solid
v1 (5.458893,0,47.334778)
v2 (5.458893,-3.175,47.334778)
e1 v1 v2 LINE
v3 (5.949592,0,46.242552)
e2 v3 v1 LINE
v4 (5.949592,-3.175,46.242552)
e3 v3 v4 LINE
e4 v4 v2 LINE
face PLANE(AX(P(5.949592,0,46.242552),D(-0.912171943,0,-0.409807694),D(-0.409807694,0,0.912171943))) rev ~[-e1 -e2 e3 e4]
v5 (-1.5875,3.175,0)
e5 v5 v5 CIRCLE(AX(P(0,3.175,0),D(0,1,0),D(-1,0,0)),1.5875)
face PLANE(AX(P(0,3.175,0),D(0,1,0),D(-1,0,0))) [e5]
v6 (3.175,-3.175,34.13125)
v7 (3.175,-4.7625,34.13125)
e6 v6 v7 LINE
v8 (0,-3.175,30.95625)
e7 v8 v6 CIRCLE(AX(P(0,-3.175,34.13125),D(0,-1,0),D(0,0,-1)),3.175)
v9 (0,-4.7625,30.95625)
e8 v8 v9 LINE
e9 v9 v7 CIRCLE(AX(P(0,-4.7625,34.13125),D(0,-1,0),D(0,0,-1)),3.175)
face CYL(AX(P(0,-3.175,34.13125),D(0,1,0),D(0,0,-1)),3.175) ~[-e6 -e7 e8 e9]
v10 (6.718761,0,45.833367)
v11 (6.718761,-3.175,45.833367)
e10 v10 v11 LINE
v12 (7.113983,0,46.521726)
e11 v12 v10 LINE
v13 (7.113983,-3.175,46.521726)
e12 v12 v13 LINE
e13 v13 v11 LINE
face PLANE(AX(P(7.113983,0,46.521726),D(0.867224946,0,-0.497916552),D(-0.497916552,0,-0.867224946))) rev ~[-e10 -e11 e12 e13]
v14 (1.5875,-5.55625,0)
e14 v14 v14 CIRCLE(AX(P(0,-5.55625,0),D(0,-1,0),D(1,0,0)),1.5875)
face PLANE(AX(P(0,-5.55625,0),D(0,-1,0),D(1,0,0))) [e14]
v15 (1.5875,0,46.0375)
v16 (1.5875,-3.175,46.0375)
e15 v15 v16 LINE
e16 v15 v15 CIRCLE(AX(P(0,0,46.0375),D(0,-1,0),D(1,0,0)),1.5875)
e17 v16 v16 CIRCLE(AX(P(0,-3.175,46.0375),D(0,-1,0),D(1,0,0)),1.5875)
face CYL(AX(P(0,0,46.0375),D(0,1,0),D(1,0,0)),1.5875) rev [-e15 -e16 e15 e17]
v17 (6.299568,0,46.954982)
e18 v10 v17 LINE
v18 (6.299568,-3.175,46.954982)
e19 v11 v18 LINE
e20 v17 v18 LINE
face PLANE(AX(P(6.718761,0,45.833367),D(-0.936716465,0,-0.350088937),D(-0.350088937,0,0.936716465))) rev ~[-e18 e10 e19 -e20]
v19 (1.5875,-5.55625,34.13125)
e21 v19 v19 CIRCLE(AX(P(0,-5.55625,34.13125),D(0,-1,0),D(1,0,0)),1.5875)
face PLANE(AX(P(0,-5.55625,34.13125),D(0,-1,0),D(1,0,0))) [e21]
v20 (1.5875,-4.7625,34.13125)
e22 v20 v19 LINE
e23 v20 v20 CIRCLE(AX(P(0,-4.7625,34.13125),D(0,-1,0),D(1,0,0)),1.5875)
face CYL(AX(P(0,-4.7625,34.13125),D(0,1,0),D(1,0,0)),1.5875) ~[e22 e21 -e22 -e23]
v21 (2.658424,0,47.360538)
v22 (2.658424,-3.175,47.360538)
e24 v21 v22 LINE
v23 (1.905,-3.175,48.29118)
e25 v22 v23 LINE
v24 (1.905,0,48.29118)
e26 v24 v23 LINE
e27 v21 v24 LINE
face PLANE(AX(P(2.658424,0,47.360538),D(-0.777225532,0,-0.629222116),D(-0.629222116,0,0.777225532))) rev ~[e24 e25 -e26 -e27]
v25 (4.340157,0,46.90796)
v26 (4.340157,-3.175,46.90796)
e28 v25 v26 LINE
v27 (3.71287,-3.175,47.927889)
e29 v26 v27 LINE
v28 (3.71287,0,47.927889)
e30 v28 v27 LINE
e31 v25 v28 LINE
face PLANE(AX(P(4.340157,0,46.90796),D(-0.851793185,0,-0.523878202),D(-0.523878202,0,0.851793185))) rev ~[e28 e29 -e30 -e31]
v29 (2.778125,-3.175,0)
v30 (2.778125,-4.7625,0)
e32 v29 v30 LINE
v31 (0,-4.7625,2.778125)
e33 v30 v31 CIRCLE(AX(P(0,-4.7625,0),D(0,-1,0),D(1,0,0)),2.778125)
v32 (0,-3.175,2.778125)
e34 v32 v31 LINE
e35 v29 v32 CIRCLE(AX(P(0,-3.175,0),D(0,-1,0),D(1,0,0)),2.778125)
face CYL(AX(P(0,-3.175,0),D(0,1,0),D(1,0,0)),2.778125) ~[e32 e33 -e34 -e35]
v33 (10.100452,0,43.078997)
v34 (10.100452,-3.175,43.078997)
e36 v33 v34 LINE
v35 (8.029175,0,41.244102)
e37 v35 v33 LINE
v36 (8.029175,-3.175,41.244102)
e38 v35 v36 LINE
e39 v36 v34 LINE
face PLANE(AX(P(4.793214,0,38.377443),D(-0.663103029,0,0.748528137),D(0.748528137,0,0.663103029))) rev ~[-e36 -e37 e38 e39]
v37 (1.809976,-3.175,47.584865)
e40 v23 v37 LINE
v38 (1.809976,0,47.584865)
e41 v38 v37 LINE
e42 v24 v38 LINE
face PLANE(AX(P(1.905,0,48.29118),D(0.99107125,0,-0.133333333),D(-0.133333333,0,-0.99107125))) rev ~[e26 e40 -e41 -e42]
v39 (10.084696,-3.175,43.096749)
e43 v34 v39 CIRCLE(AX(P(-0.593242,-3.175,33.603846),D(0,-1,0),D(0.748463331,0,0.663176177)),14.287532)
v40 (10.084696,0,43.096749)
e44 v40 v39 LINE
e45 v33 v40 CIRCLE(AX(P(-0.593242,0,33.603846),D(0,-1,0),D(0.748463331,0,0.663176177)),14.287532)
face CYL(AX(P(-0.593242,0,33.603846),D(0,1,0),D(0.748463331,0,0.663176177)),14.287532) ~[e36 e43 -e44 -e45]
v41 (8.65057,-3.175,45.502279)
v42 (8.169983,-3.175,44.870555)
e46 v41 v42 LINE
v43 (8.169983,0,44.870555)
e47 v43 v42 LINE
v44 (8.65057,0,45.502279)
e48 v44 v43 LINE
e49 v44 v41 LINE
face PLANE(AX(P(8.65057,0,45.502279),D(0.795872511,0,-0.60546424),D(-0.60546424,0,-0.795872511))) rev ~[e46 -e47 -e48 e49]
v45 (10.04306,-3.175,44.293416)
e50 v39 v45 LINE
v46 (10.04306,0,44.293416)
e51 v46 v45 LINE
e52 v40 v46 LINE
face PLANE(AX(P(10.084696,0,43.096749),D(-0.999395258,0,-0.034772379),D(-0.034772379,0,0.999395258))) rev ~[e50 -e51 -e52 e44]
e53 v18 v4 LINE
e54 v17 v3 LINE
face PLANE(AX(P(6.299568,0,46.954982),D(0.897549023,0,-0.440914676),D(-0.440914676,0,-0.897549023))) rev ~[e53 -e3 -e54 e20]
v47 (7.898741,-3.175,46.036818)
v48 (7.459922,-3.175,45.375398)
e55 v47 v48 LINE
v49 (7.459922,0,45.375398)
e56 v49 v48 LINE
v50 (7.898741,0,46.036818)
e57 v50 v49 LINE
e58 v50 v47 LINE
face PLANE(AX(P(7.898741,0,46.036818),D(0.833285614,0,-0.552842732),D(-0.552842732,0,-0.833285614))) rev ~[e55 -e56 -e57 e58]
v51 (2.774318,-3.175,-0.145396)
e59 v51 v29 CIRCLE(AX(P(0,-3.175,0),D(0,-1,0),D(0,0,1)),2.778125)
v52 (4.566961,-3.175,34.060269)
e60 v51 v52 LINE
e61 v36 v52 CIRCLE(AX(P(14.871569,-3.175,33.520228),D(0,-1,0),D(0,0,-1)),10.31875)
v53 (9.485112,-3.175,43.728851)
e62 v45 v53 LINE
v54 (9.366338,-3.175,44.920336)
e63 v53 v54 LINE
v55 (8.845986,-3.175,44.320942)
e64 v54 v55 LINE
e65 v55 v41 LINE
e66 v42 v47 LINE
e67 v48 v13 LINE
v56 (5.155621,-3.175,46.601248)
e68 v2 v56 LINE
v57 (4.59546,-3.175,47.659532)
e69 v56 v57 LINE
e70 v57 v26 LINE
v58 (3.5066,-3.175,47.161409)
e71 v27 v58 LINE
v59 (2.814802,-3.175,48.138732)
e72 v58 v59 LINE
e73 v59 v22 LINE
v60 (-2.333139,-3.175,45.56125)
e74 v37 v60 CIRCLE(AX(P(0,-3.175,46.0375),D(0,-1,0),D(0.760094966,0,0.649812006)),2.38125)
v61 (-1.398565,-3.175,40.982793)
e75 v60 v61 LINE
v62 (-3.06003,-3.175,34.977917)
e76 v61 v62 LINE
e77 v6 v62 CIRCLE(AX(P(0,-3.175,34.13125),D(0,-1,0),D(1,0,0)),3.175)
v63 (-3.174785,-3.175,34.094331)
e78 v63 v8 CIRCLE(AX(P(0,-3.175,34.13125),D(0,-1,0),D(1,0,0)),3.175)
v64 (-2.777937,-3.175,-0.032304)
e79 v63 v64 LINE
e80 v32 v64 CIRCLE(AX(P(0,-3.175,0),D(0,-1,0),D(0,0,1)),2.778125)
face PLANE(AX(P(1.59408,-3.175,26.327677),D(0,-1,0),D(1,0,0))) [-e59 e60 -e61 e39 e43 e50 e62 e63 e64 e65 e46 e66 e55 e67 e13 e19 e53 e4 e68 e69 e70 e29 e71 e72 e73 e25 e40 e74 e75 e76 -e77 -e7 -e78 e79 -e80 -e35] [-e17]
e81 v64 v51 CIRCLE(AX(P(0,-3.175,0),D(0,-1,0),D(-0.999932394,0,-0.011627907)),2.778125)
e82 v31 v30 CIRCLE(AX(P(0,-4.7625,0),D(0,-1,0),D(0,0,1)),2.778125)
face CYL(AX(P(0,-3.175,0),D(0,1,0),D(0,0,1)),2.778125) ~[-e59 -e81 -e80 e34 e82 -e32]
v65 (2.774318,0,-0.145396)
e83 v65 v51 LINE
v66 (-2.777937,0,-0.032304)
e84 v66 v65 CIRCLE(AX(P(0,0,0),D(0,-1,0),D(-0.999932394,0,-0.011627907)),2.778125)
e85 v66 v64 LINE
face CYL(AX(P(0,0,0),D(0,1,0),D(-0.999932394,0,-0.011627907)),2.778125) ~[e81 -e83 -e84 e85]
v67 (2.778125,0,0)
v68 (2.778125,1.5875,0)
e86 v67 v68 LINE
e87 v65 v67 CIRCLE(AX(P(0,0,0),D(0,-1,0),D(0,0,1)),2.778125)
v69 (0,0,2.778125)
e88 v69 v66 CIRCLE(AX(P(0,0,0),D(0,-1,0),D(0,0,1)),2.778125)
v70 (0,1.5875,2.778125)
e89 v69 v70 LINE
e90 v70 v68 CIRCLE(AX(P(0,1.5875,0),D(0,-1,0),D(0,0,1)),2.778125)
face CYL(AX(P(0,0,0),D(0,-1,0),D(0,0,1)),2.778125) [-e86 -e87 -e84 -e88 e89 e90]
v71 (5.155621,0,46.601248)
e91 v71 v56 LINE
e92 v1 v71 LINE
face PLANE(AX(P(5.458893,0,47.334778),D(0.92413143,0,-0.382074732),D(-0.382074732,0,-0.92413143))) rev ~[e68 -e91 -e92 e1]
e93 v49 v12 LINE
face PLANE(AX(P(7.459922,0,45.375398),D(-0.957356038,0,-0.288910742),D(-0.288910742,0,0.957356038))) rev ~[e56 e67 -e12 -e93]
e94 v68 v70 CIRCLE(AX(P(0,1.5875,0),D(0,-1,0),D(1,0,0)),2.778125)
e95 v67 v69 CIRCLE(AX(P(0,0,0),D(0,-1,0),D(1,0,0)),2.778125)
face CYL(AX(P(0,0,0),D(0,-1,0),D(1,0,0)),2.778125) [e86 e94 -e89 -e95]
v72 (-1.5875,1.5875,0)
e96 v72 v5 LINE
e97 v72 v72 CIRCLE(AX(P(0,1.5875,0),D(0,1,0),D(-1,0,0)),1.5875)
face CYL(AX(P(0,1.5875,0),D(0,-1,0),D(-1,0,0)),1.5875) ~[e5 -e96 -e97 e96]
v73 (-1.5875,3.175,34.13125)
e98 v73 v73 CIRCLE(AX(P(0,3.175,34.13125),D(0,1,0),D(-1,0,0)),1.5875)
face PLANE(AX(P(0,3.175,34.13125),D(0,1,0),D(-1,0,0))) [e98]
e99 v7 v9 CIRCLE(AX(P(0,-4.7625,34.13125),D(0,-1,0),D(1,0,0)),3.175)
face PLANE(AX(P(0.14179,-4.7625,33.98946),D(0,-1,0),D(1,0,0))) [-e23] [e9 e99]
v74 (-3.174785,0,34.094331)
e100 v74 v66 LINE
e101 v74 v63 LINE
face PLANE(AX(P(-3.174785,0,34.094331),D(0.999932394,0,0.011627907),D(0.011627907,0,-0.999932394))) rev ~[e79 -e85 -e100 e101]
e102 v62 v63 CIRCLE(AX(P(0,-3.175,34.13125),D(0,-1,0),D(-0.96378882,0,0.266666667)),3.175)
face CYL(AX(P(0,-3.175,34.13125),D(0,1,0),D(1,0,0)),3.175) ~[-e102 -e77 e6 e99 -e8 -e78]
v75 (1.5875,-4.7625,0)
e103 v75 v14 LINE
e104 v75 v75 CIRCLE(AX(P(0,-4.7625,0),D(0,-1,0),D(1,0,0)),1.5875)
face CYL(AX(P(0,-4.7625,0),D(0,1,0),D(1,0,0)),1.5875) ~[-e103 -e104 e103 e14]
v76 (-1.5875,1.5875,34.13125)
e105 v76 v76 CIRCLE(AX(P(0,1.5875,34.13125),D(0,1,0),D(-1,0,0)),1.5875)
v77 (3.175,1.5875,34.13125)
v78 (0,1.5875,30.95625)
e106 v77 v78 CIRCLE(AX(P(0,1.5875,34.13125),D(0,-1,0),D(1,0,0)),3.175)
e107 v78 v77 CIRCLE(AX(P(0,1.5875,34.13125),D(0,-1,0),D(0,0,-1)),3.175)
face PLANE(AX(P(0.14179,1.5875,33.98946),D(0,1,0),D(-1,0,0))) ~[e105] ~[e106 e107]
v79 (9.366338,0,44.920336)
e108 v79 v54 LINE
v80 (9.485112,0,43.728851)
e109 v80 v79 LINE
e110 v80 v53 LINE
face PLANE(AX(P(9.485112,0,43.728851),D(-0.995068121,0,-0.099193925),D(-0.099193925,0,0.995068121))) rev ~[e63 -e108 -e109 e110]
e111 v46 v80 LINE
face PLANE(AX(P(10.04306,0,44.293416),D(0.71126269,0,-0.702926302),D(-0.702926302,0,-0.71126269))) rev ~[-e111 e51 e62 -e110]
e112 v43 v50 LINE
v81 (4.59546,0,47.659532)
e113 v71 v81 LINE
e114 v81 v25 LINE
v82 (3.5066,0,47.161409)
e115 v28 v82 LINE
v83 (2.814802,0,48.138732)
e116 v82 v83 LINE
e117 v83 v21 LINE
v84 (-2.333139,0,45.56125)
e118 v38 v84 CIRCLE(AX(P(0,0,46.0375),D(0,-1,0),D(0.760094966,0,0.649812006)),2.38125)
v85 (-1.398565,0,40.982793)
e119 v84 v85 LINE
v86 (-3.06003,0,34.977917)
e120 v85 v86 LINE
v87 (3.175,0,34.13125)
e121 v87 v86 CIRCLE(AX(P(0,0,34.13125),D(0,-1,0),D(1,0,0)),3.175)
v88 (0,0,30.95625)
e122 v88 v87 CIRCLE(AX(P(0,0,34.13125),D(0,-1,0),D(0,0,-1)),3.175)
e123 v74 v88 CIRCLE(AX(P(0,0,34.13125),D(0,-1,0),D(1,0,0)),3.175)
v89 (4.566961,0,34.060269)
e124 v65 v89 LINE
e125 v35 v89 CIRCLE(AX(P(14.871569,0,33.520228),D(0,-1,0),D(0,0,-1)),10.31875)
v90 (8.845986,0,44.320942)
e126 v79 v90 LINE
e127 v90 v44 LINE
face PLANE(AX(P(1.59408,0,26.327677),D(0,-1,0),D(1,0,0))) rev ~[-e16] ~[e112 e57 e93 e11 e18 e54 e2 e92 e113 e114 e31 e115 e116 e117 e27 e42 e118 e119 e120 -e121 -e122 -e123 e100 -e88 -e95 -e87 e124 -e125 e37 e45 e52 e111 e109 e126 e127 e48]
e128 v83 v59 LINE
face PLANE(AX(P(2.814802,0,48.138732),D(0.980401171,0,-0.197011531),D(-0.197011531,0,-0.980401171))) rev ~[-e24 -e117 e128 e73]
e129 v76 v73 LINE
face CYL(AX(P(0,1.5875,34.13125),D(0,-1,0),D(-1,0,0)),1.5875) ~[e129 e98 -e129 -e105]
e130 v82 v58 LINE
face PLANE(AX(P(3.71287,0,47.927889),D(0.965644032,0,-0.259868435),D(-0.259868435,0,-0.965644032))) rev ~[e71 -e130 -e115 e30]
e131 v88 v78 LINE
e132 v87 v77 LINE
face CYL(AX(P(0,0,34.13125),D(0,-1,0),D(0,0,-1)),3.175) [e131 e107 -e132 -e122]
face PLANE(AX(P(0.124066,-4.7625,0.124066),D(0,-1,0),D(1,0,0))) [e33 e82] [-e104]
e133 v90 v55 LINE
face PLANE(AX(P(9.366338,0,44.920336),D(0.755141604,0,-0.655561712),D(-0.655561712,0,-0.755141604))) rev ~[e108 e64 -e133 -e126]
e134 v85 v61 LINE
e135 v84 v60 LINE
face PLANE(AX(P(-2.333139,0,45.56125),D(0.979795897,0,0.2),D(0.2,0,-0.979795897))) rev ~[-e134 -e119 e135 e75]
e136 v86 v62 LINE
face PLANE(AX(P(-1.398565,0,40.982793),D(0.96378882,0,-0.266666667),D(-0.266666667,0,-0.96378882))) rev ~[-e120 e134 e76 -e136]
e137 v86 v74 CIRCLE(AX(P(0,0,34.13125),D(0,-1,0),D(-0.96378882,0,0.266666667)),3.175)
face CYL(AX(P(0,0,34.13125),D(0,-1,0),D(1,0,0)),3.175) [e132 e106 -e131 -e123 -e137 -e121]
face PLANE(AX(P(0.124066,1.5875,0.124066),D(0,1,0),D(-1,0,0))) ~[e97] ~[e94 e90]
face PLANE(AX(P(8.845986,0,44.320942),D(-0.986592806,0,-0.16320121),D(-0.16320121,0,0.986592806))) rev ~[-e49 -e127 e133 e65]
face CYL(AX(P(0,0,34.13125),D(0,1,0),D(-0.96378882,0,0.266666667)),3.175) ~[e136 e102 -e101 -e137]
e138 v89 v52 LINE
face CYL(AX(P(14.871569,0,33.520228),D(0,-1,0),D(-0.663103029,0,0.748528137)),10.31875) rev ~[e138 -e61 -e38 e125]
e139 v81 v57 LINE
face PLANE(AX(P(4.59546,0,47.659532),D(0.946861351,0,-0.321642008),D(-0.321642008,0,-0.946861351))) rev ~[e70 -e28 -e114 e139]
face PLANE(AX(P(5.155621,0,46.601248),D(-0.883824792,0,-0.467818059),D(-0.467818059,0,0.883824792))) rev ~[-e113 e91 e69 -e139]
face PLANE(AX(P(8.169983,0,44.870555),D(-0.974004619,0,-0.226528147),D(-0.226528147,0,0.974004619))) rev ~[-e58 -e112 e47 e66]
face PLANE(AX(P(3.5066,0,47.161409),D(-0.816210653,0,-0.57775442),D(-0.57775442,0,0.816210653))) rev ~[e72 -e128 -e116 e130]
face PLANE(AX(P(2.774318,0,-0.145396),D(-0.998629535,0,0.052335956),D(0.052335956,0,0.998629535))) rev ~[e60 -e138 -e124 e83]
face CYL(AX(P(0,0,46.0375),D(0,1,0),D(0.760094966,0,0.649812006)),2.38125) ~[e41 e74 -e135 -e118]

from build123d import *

# Parameters (mm, degrees)
F0_R     = 1.5875
F1_DEPTH = 3.175
F5_DEPTH = 1.5875
F6_R     = 1.5875
F7_DEPTH = 0.79375
F8_R     = 1.5875
F9_DEPTH = 1.5875
F10_R    = 10.31875


# Not quite as in the source:
# - a feature of the source that left no trace in its solid (it failed there, or was rolled back) is left out
# - a pattern or mirror of a feature is missing from the dataset's text; its kind, count and spacing are read off the source's solid


with BuildPart() as f1:
    # F0 (on Front) → F1 (new body)
    with BuildSketch(Plane.XZ):
        with BuildLine():
            Line((-3.1747853497, 34.0943313953), (-2.777937181, -0.0323037791))
            ThreePointArc((-2.777937181, -0.0323037791), (-0.0565749778, -2.7775488812), (2.7743176762, -0.1453958284))
            Line((2.7743176762, -0.1453958284), (4.7932141006, 38.3774428034))
            Line((4.7932141006, 38.3774428034), (10.1004515544, 43.0789965018))
            ThreePointArc((10.1004515544, 43.0789965018), (10.0925772968, 43.0878759884), (10.0846956661, 43.0967489312))
            Line((10.0846956661, 43.0967489312), (10.0430595374, 44.2934156835))
            Line((10.0430595374, 44.2934156835), (9.4851117853, 43.7288509233))
            Line((9.4851117853, 43.7288509233), (9.3663379592, 44.9203356649))
            Line((9.3663379592, 44.9203356649), (8.8459858503, 44.3209420168))
            Line((8.8459858503, 44.3209420168), (8.6505703336, 45.5022785002))
            Line((8.6505703336, 45.5022785002), (8.1699830928, 44.8705546947))
            Line((8.1699830928, 44.8705546947), (7.8987405265, 46.0368182075))
            Line((7.8987405265, 46.0368182075), (7.4599216084, 45.3753977516))
            Line((7.4599216084, 45.3753977516), (7.1139827386, 46.5217264172))
            Line((7.1139827386, 46.5217264172), (6.7187614754, 45.8333666162))
            Line((6.7187614754, 45.8333666162), (6.2995684394, 46.9549816615))
            Line((6.2995684394, 46.9549816615), (5.949592415, 46.2425521248))
            Line((5.949592415, 46.2425521248), (5.4588927295, 47.334777802))
            Line((5.4588927295, 47.334777802), (5.1556209112, 46.6012484796))
            Line((5.1556209112, 46.6012484796), (4.5954601871, 47.6595315582))
            Line((4.5954601871, 47.6595315582), (4.3401568434, 46.9079603605))
            Line((4.3401568434, 46.9079603605), (3.7128702582, 47.9278891087))
            Line((3.7128702582, 47.9278891087), (3.5065996883, 47.1614091582))
            Line((3.5065996883, 47.1614091582), (2.8148022515, 48.1387317342))
            Line((2.8148022515, 48.1387317342), (2.6584243486, 47.3605383046))
            Line((2.6584243486, 47.3605383046), (1.905, 48.2911804818))
            Line((1.905, 48.2911804818), (1.8099761367, 47.5848648397))
            ThreePointArc((1.8099761367, 47.5848648397), (-1.0450737271, 48.1771664384), (-2.33313898, 45.56125))
            Line((-2.33313898, 45.56125), (-1.3985654512, 40.9827934547))
            Line((-1.3985654512, 40.9827934547), (-3.0600295024, 34.9779166667))
            ThreePointArc((-3.0600295024, 34.9779166667), (-3.1485567794, 34.5401695607), (-3.1747853497, 34.0943313953))
        make_face()
        with Locations((0, 46.0375)):
            Circle(F0_R, mode=Mode.SUBTRACT)
    extrude(amount=F1_DEPTH)

    # F4 (on face) → F5 (join)
    with BuildSketch(Plane.XZ.offset(3.175)):
        with BuildLine():
            ThreePointArc((0, 2.778125), (-1.9644310265, -1.9644310265), (2.778125, 0))
            ThreePointArc((2.778125, 0), (1.9644310265, 1.9644310265), (0, 2.778125))
        make_face()
        with BuildLine():
            ThreePointArc((3.175, 34.13125), (-2.2450640303, 36.3763140303), (0, 30.95625))
            ThreePointArc((0, 30.95625), (2.2450640303, 31.8861859697), (3.175, 34.13125))
        make_face()
    f5 = extrude(amount=F5_DEPTH)

    # F5_copies: F5 across plane
    add(f5.mirror(Plane.ZX.offset(-1.5875)))

    # F6 (on face) → F7 (join)
    with BuildSketch(Plane.XZ.offset(4.7625)):
        Circle(F6_R)
        with Locations((0, 34.13125)):
            Circle(F6_R)
    extrude(amount=F7_DEPTH)

    # F8 (on face) → F9 (join)
    with BuildSketch(Plane(origin=(0, 1.5875, 0), x_dir=(-1, 0, 0), z_dir=(0, 1, 0))):
        Circle(F8_R)
        with Locations((0, 34.13125)):
            Circle(F8_R)
    extrude(amount=F9_DEPTH)

    # F10
    f10_edges = [f1.edges().sort_by_distance(p)[0] for p in [
        (4.793214, -1.5875, 38.377443),
    ]]
    fillet(f10_edges, radius=F10_R)


solid = f1.part
